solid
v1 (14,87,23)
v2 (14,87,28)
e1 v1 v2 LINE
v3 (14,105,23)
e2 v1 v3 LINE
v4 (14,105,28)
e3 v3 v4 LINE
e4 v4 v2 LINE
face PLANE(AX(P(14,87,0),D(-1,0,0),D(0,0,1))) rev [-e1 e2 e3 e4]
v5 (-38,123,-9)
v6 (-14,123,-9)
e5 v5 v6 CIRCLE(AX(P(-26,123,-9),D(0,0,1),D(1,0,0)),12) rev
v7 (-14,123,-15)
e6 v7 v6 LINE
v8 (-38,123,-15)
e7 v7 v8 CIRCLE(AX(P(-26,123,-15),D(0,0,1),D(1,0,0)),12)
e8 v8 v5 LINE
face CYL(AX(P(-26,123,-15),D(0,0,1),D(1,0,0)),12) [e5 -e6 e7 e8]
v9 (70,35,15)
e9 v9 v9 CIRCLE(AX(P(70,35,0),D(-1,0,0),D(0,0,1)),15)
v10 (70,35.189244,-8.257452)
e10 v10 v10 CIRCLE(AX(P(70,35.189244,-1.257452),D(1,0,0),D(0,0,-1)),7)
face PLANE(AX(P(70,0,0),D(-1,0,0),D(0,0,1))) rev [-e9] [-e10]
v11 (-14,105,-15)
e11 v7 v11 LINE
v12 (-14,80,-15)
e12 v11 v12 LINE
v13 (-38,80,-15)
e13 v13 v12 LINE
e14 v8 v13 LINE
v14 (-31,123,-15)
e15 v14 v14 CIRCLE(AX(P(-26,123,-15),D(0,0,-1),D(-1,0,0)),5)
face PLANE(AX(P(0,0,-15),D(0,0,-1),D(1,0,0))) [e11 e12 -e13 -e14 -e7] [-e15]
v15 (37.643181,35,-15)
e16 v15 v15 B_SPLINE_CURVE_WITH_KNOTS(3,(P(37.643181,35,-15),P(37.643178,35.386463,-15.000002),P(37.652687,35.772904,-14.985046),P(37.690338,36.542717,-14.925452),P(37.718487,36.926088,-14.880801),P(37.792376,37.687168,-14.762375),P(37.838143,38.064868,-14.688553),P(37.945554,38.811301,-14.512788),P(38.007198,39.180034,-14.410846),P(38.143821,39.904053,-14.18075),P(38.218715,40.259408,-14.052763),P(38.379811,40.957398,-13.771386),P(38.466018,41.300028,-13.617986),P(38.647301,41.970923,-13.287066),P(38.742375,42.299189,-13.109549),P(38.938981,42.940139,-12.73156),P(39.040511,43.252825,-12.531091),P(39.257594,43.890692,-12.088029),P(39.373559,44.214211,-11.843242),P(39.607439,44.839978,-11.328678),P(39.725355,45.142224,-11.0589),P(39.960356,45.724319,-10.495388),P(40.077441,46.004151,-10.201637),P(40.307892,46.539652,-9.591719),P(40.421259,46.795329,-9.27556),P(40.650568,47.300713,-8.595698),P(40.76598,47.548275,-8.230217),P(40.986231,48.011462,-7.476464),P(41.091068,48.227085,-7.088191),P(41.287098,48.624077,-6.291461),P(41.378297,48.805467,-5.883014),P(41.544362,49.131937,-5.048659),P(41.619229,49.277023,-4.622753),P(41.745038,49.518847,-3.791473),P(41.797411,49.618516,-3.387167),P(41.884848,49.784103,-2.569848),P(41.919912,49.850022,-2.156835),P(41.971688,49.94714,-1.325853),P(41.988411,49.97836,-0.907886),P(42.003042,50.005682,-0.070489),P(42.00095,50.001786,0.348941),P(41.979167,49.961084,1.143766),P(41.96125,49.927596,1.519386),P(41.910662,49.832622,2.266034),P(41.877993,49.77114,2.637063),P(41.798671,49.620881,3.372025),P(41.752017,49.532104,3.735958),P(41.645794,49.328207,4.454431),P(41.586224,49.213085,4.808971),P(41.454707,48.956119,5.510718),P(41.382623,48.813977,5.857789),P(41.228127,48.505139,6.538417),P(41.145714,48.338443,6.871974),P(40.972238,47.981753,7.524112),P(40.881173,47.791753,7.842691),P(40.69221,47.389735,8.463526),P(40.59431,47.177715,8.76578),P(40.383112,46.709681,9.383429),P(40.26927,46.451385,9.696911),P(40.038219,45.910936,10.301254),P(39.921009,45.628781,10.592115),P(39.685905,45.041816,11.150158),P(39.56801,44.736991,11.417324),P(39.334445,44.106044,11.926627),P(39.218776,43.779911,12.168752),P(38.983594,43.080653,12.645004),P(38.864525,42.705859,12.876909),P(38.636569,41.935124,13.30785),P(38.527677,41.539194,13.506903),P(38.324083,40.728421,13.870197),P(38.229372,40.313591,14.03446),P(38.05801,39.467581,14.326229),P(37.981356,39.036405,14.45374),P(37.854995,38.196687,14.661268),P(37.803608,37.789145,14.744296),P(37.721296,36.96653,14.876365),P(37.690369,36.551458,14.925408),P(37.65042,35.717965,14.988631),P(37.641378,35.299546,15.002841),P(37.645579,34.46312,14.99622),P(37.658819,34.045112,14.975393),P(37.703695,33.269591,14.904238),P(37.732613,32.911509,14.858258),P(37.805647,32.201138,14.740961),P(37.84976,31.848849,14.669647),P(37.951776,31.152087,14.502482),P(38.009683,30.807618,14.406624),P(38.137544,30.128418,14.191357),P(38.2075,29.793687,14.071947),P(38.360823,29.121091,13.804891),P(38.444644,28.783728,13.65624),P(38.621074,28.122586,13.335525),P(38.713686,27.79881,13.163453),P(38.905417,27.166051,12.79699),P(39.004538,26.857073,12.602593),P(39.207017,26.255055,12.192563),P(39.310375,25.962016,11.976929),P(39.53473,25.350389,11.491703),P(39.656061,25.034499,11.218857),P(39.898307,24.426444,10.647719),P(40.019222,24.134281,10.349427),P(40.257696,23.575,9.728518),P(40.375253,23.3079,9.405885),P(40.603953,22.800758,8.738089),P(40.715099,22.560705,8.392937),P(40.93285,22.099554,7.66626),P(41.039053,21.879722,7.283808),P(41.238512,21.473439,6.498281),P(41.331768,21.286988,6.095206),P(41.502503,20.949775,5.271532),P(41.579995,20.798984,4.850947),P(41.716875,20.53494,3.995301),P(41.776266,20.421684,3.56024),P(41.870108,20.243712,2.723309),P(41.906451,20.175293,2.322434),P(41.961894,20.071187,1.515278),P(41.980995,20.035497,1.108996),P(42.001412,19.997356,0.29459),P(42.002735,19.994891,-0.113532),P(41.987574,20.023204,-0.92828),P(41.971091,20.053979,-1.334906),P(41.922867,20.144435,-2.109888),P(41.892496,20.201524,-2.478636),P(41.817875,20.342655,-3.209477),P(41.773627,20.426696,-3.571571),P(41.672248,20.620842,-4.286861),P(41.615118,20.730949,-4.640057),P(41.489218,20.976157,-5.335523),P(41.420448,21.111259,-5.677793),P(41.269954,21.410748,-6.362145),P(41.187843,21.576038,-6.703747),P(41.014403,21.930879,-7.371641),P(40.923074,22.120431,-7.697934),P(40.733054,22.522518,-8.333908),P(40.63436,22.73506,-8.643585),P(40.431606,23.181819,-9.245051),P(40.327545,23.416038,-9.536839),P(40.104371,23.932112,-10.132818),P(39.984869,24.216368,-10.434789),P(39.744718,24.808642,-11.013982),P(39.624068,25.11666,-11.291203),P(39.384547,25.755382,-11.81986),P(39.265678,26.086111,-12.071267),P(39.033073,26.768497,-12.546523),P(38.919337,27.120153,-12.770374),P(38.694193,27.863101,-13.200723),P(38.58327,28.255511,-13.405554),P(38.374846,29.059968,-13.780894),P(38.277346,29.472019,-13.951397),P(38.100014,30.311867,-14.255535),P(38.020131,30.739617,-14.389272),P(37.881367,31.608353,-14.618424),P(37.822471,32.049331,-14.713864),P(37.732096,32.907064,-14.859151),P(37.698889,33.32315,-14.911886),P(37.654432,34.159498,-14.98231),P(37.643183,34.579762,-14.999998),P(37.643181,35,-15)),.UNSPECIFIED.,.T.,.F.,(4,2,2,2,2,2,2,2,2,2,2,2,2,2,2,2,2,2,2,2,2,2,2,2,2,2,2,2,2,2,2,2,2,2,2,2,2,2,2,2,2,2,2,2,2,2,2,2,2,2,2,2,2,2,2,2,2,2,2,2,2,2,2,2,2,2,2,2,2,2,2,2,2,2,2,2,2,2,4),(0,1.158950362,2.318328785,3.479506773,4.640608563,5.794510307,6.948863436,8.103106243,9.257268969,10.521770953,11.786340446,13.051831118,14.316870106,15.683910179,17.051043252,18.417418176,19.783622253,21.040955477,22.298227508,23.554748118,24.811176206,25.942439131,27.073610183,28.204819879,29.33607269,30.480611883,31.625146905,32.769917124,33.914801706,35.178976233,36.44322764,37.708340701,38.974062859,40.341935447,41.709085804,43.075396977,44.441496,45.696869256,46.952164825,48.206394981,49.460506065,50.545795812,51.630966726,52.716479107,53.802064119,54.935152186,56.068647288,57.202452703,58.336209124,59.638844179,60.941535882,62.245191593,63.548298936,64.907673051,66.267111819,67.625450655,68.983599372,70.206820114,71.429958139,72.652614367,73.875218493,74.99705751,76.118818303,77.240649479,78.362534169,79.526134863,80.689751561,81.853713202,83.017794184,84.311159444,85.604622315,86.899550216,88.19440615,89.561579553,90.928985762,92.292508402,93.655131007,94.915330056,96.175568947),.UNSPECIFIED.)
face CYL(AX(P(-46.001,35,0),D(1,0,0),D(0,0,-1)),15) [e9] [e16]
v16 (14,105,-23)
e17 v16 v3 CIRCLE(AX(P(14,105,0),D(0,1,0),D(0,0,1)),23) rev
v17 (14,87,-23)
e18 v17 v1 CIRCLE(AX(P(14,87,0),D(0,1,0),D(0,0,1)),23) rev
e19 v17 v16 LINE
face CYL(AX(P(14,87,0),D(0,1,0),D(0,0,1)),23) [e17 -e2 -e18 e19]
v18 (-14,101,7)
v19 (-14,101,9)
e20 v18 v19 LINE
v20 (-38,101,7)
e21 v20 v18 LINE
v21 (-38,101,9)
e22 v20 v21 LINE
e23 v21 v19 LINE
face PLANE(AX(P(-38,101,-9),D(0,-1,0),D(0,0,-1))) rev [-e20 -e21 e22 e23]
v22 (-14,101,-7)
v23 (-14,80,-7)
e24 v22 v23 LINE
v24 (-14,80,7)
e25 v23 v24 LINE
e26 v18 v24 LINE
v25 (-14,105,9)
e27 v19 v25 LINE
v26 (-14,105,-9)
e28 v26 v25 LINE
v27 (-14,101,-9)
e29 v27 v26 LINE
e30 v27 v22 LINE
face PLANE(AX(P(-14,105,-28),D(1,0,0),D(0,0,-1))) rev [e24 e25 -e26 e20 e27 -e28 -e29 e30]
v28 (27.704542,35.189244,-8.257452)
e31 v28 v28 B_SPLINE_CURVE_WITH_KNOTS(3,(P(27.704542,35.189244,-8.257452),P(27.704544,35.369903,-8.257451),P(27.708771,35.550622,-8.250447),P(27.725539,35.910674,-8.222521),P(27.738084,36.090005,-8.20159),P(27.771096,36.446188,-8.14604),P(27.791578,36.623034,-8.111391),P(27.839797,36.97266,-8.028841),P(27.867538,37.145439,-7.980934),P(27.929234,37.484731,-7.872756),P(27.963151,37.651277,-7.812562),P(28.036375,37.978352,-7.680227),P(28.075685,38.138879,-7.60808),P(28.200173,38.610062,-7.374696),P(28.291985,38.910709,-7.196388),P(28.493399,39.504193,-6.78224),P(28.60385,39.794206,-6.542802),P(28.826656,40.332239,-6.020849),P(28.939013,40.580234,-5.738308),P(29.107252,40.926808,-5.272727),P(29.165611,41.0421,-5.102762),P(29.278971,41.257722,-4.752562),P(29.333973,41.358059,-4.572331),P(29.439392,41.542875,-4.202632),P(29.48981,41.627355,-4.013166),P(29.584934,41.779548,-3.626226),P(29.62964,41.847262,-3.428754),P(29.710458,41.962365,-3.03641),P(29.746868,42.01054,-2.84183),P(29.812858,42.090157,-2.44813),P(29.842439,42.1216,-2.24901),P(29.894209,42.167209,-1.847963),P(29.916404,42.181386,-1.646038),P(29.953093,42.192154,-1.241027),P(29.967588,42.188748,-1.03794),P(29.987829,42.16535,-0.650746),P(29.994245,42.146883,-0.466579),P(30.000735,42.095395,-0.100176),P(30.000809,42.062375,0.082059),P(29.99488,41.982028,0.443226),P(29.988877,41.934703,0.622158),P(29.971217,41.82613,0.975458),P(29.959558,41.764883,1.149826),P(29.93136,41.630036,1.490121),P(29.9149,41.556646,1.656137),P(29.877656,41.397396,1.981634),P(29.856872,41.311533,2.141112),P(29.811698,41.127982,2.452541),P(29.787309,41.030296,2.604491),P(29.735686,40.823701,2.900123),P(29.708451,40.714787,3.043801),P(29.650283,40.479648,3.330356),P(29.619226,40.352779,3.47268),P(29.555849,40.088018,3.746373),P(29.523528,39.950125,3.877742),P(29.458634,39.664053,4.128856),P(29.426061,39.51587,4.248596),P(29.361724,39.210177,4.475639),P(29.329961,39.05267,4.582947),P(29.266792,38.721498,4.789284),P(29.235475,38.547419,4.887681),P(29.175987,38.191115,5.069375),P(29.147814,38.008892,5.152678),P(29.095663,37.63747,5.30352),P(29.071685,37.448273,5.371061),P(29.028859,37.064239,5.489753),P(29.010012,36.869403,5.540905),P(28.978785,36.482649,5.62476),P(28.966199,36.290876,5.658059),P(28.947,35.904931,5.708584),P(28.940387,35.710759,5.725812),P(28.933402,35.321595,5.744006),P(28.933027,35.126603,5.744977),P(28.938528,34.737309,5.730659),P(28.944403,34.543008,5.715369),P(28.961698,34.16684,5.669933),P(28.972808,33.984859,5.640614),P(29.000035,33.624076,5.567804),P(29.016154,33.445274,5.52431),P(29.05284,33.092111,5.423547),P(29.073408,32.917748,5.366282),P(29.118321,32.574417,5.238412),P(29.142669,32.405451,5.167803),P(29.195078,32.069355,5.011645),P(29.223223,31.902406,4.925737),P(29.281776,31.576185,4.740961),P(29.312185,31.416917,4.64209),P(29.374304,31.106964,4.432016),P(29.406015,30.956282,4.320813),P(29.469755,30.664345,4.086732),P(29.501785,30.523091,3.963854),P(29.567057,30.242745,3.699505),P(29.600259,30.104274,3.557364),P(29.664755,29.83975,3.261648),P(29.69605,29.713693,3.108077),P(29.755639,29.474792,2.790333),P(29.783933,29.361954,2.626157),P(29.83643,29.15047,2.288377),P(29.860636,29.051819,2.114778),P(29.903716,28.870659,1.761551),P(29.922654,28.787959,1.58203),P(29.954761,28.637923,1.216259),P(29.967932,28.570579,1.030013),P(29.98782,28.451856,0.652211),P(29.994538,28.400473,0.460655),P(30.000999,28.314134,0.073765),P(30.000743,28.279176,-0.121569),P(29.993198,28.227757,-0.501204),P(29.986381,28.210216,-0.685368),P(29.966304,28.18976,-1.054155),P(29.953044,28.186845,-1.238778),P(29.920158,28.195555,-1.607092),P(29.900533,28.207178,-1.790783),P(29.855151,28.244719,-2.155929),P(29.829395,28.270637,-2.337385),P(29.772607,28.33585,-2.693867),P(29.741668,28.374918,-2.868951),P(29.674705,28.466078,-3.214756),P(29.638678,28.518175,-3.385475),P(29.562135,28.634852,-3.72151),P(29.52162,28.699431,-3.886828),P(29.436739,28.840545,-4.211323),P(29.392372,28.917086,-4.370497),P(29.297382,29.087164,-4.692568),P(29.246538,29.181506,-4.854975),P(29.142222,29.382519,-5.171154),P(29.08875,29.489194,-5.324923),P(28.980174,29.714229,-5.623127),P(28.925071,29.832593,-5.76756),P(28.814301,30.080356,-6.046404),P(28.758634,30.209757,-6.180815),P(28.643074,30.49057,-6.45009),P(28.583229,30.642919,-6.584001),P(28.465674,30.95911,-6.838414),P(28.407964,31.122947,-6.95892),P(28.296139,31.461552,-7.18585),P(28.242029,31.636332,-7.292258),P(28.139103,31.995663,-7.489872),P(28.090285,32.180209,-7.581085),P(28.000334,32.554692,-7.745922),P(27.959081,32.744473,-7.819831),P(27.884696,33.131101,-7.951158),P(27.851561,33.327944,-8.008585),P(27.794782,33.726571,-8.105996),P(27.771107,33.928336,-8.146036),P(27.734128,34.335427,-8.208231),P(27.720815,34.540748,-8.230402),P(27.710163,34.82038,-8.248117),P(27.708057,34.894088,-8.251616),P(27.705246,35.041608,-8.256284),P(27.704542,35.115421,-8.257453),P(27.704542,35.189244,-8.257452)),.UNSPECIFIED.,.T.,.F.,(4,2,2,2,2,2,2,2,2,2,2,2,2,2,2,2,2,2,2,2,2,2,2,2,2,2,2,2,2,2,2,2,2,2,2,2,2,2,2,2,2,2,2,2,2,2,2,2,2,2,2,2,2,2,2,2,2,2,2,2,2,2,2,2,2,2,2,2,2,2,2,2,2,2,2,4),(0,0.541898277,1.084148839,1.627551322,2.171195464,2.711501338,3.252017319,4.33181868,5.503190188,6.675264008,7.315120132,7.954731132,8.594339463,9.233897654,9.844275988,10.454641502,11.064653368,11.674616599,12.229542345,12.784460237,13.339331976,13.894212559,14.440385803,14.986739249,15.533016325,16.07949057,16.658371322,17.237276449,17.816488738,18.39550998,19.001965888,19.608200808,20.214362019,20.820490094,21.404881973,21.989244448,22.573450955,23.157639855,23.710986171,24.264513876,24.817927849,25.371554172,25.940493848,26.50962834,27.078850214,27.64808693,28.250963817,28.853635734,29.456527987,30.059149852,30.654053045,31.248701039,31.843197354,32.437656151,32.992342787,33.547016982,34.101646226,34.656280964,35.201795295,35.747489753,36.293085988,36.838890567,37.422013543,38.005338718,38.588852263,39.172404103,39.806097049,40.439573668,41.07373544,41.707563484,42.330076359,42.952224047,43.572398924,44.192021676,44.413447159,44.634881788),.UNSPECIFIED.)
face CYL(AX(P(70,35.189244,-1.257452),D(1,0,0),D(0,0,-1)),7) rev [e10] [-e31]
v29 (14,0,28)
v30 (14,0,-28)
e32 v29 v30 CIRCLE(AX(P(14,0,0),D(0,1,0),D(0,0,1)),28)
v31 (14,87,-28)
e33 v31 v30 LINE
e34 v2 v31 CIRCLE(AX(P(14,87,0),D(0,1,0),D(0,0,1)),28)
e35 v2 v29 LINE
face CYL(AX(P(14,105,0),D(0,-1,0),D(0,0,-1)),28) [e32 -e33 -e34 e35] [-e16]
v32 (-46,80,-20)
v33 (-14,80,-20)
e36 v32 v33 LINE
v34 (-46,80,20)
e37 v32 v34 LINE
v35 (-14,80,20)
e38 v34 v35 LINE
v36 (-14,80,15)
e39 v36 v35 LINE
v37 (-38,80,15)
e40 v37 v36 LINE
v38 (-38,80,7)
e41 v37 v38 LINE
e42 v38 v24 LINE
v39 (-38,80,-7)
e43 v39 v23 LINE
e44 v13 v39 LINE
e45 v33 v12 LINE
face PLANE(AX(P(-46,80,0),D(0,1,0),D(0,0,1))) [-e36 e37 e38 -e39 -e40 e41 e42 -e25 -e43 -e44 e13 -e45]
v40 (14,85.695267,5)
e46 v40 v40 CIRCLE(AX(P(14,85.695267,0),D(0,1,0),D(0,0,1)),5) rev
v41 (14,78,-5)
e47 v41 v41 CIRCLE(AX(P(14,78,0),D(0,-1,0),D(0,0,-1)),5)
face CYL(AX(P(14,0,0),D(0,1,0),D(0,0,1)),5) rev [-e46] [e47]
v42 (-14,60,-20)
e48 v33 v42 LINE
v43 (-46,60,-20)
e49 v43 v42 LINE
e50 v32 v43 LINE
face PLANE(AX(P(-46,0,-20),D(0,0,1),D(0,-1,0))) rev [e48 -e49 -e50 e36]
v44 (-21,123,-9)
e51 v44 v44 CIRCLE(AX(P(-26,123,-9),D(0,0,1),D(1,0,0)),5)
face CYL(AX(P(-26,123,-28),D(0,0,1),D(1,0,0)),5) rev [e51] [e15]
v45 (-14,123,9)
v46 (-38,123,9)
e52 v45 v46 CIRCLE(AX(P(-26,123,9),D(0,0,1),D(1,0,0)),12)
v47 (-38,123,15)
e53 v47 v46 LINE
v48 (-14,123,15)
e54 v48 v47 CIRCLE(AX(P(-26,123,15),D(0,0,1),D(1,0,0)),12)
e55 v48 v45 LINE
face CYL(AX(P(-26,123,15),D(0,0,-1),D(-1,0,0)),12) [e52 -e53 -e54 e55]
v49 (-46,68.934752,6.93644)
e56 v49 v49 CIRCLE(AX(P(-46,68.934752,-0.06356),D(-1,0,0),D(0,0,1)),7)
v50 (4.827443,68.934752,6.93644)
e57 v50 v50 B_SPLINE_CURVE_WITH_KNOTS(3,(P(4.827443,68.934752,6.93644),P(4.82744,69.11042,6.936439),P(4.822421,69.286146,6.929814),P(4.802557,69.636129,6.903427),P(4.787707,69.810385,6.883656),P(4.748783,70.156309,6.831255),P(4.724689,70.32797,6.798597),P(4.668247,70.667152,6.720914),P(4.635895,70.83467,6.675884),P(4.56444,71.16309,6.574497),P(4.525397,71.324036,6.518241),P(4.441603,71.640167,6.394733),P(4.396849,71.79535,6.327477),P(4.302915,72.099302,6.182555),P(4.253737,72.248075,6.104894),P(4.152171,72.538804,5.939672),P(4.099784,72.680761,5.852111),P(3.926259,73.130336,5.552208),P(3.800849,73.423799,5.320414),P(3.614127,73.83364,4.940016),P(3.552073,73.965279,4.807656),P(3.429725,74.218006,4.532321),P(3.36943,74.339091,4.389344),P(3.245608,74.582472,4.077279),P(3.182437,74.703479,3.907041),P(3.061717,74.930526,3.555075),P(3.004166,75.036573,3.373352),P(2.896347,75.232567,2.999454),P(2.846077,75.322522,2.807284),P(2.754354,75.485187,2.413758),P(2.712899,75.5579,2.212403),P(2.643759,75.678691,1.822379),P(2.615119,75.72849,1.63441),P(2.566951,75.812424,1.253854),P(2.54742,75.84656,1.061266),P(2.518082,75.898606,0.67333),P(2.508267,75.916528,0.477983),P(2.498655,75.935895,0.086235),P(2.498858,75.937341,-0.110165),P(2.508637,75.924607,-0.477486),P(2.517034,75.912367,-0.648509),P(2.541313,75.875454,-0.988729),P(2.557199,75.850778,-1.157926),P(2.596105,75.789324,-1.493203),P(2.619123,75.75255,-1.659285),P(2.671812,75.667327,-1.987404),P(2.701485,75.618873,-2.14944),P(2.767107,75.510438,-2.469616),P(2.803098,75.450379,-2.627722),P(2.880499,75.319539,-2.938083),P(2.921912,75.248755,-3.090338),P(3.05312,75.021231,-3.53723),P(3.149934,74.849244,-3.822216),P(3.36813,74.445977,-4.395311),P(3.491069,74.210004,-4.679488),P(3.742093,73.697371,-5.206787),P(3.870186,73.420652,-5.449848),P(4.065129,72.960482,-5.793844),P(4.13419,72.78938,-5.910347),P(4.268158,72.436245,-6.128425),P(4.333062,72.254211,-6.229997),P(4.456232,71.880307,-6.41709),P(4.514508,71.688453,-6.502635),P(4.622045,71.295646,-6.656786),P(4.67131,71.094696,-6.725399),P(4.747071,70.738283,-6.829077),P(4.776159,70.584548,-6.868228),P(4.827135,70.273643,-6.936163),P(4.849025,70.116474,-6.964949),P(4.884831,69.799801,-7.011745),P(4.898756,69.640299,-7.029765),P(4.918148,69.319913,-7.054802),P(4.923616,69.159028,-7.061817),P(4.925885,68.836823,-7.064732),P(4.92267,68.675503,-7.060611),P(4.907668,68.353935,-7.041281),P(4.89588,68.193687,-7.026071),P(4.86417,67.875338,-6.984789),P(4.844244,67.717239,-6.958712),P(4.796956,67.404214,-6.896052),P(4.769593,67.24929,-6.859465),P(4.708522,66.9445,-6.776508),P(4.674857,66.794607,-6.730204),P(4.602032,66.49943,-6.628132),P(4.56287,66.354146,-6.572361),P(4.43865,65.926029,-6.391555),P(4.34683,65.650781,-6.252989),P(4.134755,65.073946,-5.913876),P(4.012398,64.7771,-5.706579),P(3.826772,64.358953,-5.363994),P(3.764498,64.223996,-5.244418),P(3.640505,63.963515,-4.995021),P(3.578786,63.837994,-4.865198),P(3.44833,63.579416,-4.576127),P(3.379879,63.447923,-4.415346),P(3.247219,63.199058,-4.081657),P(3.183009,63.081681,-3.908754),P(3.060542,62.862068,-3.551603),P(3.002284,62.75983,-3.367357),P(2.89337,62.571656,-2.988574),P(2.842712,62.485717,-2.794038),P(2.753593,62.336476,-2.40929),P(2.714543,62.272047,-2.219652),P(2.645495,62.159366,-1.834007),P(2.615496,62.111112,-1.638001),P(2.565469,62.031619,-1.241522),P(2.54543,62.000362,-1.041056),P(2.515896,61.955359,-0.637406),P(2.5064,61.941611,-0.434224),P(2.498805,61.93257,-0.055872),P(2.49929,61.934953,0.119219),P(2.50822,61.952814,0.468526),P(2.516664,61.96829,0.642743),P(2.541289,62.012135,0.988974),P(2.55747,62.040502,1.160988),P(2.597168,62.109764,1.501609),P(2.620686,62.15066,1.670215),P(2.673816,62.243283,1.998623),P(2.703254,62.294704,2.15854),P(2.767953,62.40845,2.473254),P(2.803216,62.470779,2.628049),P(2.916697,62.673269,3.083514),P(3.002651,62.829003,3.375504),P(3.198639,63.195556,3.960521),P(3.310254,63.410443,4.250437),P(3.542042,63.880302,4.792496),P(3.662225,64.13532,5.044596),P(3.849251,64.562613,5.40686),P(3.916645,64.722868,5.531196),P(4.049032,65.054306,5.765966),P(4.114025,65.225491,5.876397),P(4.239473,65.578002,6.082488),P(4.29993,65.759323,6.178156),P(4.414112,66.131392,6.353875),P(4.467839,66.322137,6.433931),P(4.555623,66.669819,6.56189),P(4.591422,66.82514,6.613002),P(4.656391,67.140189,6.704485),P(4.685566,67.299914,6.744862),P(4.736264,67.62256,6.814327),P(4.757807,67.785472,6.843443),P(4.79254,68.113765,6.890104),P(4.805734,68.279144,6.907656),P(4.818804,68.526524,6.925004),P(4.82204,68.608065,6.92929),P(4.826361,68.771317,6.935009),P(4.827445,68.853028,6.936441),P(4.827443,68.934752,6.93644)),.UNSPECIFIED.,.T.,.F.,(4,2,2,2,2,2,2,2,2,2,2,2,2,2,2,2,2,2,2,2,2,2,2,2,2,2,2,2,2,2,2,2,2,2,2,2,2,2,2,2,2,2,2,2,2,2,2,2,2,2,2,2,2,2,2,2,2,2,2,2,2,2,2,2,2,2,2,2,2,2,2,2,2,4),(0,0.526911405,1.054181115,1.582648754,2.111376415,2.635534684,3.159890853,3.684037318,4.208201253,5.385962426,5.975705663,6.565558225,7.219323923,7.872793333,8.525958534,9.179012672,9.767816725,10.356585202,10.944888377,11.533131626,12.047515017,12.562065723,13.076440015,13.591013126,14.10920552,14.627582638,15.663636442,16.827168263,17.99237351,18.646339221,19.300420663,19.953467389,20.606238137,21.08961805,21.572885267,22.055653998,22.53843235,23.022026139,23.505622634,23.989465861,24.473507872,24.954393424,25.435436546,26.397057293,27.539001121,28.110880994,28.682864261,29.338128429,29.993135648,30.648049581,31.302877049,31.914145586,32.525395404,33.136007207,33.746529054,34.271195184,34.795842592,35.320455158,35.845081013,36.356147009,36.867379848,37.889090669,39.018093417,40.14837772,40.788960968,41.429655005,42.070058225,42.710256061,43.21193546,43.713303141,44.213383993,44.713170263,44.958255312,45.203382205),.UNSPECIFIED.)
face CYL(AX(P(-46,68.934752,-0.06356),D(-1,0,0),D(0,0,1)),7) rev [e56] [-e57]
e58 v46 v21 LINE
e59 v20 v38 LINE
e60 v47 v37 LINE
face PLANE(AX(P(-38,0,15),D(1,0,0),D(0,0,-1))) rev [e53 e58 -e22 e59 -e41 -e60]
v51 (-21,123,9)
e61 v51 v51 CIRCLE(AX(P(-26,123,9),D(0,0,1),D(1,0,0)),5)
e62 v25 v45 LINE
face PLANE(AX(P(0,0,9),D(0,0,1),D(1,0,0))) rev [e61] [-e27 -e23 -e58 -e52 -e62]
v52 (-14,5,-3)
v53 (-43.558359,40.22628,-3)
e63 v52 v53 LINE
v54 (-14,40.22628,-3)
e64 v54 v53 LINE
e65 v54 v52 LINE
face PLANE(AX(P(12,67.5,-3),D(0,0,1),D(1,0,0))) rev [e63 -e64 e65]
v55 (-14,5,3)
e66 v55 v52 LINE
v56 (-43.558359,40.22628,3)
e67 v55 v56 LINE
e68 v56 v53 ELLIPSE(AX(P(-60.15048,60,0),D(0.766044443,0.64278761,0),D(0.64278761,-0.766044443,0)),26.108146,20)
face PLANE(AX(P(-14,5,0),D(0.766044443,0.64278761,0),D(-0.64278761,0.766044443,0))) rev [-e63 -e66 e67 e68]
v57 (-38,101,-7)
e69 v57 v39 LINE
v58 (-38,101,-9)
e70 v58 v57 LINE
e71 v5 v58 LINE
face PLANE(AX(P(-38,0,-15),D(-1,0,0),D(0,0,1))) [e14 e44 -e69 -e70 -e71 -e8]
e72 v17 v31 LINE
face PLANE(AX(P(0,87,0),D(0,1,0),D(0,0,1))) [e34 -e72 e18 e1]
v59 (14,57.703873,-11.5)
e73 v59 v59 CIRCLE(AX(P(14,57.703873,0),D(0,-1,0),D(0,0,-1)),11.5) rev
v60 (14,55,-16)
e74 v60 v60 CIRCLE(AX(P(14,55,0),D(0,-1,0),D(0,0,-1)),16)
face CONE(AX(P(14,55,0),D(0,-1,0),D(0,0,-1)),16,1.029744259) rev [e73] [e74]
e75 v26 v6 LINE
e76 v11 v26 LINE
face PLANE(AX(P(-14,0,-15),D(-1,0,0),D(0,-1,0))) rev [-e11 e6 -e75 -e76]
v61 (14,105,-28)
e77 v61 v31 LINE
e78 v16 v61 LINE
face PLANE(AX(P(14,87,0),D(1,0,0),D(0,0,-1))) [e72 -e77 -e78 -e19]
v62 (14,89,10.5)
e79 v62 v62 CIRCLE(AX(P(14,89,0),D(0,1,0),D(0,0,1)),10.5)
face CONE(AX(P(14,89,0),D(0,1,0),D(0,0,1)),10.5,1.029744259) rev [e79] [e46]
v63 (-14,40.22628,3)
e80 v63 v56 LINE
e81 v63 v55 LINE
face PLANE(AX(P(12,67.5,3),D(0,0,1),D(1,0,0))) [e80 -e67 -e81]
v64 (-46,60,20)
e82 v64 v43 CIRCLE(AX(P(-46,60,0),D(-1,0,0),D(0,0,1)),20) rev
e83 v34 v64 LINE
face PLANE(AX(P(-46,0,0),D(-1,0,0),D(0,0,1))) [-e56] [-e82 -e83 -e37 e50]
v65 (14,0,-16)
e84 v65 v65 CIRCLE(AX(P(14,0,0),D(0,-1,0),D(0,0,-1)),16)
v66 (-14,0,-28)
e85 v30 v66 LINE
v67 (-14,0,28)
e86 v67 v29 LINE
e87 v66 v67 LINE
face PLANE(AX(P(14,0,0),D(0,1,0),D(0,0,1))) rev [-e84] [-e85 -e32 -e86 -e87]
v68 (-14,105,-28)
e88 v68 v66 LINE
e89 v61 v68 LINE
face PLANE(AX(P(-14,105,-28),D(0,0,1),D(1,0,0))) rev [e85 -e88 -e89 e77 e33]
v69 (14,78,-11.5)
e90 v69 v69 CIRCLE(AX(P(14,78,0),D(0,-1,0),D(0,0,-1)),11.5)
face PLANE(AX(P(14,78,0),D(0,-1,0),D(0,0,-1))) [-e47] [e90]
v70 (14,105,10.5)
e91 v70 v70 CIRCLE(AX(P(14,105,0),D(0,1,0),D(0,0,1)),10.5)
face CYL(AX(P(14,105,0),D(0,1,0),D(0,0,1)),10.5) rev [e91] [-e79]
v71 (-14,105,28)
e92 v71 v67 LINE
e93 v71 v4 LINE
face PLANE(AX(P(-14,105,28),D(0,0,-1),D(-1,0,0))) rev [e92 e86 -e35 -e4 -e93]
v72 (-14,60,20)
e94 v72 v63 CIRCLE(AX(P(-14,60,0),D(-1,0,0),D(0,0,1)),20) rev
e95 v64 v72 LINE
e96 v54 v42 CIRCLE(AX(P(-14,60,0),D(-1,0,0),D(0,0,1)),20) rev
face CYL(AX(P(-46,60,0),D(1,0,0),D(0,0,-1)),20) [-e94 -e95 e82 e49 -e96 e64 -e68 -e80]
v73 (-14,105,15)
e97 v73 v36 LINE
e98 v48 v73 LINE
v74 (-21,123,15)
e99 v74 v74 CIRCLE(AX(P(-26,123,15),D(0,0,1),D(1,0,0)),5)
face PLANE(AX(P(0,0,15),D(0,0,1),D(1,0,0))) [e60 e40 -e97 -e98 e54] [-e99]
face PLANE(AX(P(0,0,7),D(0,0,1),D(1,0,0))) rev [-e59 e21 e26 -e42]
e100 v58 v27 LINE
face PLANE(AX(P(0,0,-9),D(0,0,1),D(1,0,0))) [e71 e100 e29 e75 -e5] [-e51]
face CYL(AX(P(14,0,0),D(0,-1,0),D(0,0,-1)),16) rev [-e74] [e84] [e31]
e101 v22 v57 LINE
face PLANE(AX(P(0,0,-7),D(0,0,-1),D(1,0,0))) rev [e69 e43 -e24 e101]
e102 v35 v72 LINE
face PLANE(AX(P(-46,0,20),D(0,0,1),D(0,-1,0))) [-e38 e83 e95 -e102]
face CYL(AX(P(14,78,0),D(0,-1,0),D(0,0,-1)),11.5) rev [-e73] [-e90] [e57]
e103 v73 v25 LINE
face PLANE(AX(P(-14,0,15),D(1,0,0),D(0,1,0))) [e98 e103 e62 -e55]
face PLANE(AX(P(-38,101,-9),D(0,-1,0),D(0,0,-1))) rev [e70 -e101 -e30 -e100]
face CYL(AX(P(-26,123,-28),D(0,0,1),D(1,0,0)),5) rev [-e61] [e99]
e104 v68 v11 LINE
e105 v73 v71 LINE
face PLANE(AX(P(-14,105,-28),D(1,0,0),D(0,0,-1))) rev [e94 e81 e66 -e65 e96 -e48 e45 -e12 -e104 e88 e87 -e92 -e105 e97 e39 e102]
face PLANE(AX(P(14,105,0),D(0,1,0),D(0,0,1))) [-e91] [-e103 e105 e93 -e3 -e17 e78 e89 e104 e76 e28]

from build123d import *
from build123d.topology import SkipClean

# Parameters (mm, degrees)
EXTRUDE_1_DEPTH          = 105
SKETCH_2_W               = 40
SKETCH_2_H               = 20
EXTRUDE_2_DEPTH          = 32
EXTRUDE_4_REACH          = 141.832
SKETCH_3_R               = 15
EXTRUDE_START            = 28
EXTRUDE_5_DEPTH          = 28
EXTRUDE_START_2          = 7
SKETCH_5_W               = 24
SKETCH_5_H               = 43
EXTRUDE_6_DEPTH          = 8
SKETCH_6_W               = 24
SKETCH_6_H               = 50
CUT_EXTRUDE_1_DEPTH      = 9
CUT_EXTRUDE_2_DEPTH      = 159.031642473
CUT_EXTRUDE_2_DEPTH_BACK = 159.031642473
SKETCH_7_R               = 5
RIB_1_REACH              = 156.625
SKETCH_8_WALL_W          = 356.93996261
SKETCH_8_WALL_H          = 6
CUT_EXTRUDE_START        = -18
CUT_EXTRUDE_3_DEPTH      = 18
HOLE_WIZARD_M36_2_D      = 32
HOLE_WIZARD_M36_2_DEPTH  = 55
HOLE_WIZARD_M36_2_TIP    = 9.613769904
SKETCH_14_R              = 11.5
CUT_EXTRUDE_4_DEPTH      = 78
HOLE_WIZARD_M24_1_D      = 21
HOLE_WIZARD_M24_1_DEPTH  = 16
HOLE_WIZARD_M24_1_TIP    = 6.3090365
CUT_EXTRUDE_5_DEPTH      = 130.263297345
CUT_EXTRUDE_5_DEPTH_BACK = 130.263297345
SKETCH_16_R              = 5
HOLE_WIZARD_M16_1_REACH  = 139.824
HOLE_WIZARD_M16_1_BORE_R = 7
HOLE_WIZARD_M16_2_REACH  = 157.802
HOLE_WIZARD_M16_2_BORE_R = 7


with BuildPart() as part:
    # 草图1 → 凸台-拉伸1 (new body)
    with BuildSketch(Plane(origin=(0, 0, 0), x_dir=(1, 0, 0), z_dir=(0, 1, 0))):
        with BuildLine():
            Line((-14, 28), (14, 28))
            ThreePointArc((14, 28), (42, 0), (14, -28))
            Line((14, -28), (-14, -28))
            Line((-14, -28), (-14, 28))
        make_face()
    extrude(amount=EXTRUDE_1_DEPTH)

    # 草图2 → 凸台-拉伸2 (add)
    with BuildSketch(Plane.ZY.offset(14)):
        with BuildLine():
            ThreePointArc((20, 60), (0, 40), (-20, 60))
            Line((-20, 60), (20, 60))
        make_face()
        with Locations((0, 70)):
            Rectangle(SKETCH_2_W, SKETCH_2_H)
    extrude(amount=EXTRUDE_2_DEPTH)

    # 草图3 → 凸台-拉伸4 (add, up to next)
    with BuildSketch(Plane(origin=(42, 0, 0), x_dir=(0, 0, -1), z_dir=(1, 0, 0)), mode=Mode.PRIVATE) as extrude_4_sk1:
        with Locations((0, 35)):
            Circle(SKETCH_3_R)
    extrude_4_tool1 = extrude(extrude_4_sk1.sketch, amount=-EXTRUDE_4_REACH, mode=Mode.PRIVATE) - part.part
    add(extrude_4_tool1.solids().sort_by_distance((42, 35, 0))[0])
    add(extrude_4_tool1.solids().sort_by_distance((42, 35, 0))[1])

    # 草图4 → 凸台-拉伸5 (add)
    with SkipClean():  # the faces are left unmerged after this step: merging them gives an invalid solid
        with BuildSketch(Plane(origin=(42, 0, 0), x_dir=(0, 0, -1), z_dir=(1, 0, 0)).offset(EXTRUDE_START)):
            with BuildLine():
                ThreePointArc((0, 50), (-15, 35), (0, 20))
                ThreePointArc((0, 20), (15, 35), (0, 50))
            make_face()
        extrude(amount=-EXTRUDE_5_DEPTH)

    # 草图5 → 凸台-拉伸6 (add)
    with BuildSketch(Plane.XY.offset(EXTRUDE_START_2)):
        with Locations((-26, 101.5)):
            Rectangle(SKETCH_5_W, SKETCH_5_H)
        with BuildLine():
            Line((-38, 123), (-14, 123))
            ThreePointArc((-14, 123), (-26, 135), (-38, 123))
        make_face()
    extrude_6 = extrude(amount=EXTRUDE_6_DEPTH)

    # 镜向1: 凸台-拉伸6 across plane
    add(extrude_6.mirror(Plane.XY))

    # 草图6 → 切除-拉伸1 (cut, symmetric)
    with BuildSketch(Plane.XY):
        with Locations((-26, 126)):
            Rectangle(SKETCH_6_W, SKETCH_6_H)
    extrude(amount=CUT_EXTRUDE_1_DEPTH, both=True, mode=Mode.SUBTRACT)

    # 草图7 → 切除-拉伸2 (cut, two sides: drawn at the far end of the back side and taken through both)
    with BuildSketch(Plane.XY.offset(15).offset(-CUT_EXTRUDE_2_DEPTH_BACK)):
        with Locations((-26, 123)):
            Circle(SKETCH_7_R)
    extrude(amount=CUT_EXTRUDE_2_DEPTH + CUT_EXTRUDE_2_DEPTH_BACK, mode=Mode.SUBTRACT)

    # 草图8 wall → 筋1 (add, up to next)
    with BuildSketch(Plane(origin=(-28.684243545, 22.5, 0), x_dir=(-0.642787609684, 0.766044443121, 0), z_dir=(-0.766044443121, -0.642787609684, 0)), mode=Mode.PRIVATE) as rib_1_sk1:
        Rectangle(SKETCH_8_WALL_W, SKETCH_8_WALL_H)
    rib_1_tool1 = extrude(rib_1_sk1.sketch, amount=-RIB_1_REACH, mode=Mode.PRIVATE) - part.part
    add(rib_1_tool1.solids().sort_by_distance((-28.684243545, 22.5, 0))[0])

    # 草图9 → 切除-拉伸3 (cut)
    with BuildSketch(Plane(origin=(0, 105, 0), x_dir=(1, 0, 0), z_dir=(0, 1, 0)).offset(CUT_EXTRUDE_START)):
        with BuildLine():
            Line((14, 23), (14, 28))
            ThreePointArc((14, 28), (42, 0), (14, -28))
            Line((14, -28), (14, -23))
            ThreePointArc((14, -23), (37, 0), (14, 23))
        make_face()
    extrude(amount=CUT_EXTRUDE_3_DEPTH, mode=Mode.SUBTRACT)

    # M36 螺纹孔2
    with Locations(Plane(origin=(14, 0, 0), x_dir=(0, 0, -1), z_dir=(0, -1, 0))):
        with Locations((0, 0)):
            Hole(HOLE_WIZARD_M36_2_D / 2, depth=HOLE_WIZARD_M36_2_DEPTH)
            with Locations((0, 0, -(HOLE_WIZARD_M36_2_DEPTH + HOLE_WIZARD_M36_2_TIP / 2))):  # 118° drill point
                Cone(0, HOLE_WIZARD_M36_2_D / 2, HOLE_WIZARD_M36_2_TIP, mode=Mode.SUBTRACT)

    # 草图14 → 切除-拉伸4 (cut)
    with BuildSketch(Plane.XZ):
        with Locations(Location((14, 0, 0), (0, 0, 270))):
            Circle(SKETCH_14_R)
    extrude(amount=-CUT_EXTRUDE_4_DEPTH, mode=Mode.SUBTRACT)

    # M24 螺纹孔1
    with Locations(Plane(origin=(14, 105, 0), x_dir=(0, 0, 1), z_dir=(0, 1, 0))):
        with Locations((0, 0)):
            Hole(HOLE_WIZARD_M24_1_D / 2, depth=HOLE_WIZARD_M24_1_DEPTH)
            with Locations((0, 0, -(HOLE_WIZARD_M24_1_DEPTH + HOLE_WIZARD_M24_1_TIP / 2))):  # 118° drill point
                Cone(0, HOLE_WIZARD_M24_1_D / 2, HOLE_WIZARD_M24_1_TIP, mode=Mode.SUBTRACT)

    # 草图16 → 切除-拉伸5 (cut, two sides: drawn at the far end of the back side and taken through both)
    with BuildSketch(Plane(origin=(0, 105, 0), x_dir=(1, 0, 0), z_dir=(0, 1, 0)).offset(-CUT_EXTRUDE_5_DEPTH_BACK)):
        with Locations(Location((14, 0, 0), (0, 0, 270))):
            Circle(SKETCH_16_R)
    extrude(amount=CUT_EXTRUDE_5_DEPTH + CUT_EXTRUDE_5_DEPTH_BACK, mode=Mode.SUBTRACT)

    # M16 螺纹孔1 bore (on position points) → M16 螺纹孔1 (cut, up to next)
    with BuildSketch(Plane(origin=(-46, 68.934751758, -0.063559522), x_dir=(0, 0, -1), z_dir=(-1, 0, 0)), mode=Mode.PRIVATE) as hole_wizard_m16_1_sk1:
        Circle(HOLE_WIZARD_M16_1_BORE_R)
    hole_wizard_m16_1_tool1 = extrude(hole_wizard_m16_1_sk1.sketch, amount=-HOLE_WIZARD_M16_1_REACH, mode=Mode.PRIVATE) & part.part
    add(hole_wizard_m16_1_tool1.solids().sort_by_distance((-46, 68.934752, -0.06356))[0], mode=Mode.SUBTRACT)

    # M16 螺纹孔2 bore (on position points) → M16 螺纹孔2 (cut, up to next)
    with BuildSketch(Plane(origin=(70, 35.189243523, -1.257452157), x_dir=(0, 0, 1), z_dir=(1, 0, 0)), mode=Mode.PRIVATE) as hole_wizard_m16_2_sk1:
        Circle(HOLE_WIZARD_M16_2_BORE_R)
    hole_wizard_m16_2_tool1 = extrude(hole_wizard_m16_2_sk1.sketch, amount=-HOLE_WIZARD_M16_2_REACH, mode=Mode.PRIVATE) & part.part
    add(hole_wizard_m16_2_tool1.solids().sort_by_distance((70, 35.189244, -1.257452))[0], mode=Mode.SUBTRACT)


solid = part.part
